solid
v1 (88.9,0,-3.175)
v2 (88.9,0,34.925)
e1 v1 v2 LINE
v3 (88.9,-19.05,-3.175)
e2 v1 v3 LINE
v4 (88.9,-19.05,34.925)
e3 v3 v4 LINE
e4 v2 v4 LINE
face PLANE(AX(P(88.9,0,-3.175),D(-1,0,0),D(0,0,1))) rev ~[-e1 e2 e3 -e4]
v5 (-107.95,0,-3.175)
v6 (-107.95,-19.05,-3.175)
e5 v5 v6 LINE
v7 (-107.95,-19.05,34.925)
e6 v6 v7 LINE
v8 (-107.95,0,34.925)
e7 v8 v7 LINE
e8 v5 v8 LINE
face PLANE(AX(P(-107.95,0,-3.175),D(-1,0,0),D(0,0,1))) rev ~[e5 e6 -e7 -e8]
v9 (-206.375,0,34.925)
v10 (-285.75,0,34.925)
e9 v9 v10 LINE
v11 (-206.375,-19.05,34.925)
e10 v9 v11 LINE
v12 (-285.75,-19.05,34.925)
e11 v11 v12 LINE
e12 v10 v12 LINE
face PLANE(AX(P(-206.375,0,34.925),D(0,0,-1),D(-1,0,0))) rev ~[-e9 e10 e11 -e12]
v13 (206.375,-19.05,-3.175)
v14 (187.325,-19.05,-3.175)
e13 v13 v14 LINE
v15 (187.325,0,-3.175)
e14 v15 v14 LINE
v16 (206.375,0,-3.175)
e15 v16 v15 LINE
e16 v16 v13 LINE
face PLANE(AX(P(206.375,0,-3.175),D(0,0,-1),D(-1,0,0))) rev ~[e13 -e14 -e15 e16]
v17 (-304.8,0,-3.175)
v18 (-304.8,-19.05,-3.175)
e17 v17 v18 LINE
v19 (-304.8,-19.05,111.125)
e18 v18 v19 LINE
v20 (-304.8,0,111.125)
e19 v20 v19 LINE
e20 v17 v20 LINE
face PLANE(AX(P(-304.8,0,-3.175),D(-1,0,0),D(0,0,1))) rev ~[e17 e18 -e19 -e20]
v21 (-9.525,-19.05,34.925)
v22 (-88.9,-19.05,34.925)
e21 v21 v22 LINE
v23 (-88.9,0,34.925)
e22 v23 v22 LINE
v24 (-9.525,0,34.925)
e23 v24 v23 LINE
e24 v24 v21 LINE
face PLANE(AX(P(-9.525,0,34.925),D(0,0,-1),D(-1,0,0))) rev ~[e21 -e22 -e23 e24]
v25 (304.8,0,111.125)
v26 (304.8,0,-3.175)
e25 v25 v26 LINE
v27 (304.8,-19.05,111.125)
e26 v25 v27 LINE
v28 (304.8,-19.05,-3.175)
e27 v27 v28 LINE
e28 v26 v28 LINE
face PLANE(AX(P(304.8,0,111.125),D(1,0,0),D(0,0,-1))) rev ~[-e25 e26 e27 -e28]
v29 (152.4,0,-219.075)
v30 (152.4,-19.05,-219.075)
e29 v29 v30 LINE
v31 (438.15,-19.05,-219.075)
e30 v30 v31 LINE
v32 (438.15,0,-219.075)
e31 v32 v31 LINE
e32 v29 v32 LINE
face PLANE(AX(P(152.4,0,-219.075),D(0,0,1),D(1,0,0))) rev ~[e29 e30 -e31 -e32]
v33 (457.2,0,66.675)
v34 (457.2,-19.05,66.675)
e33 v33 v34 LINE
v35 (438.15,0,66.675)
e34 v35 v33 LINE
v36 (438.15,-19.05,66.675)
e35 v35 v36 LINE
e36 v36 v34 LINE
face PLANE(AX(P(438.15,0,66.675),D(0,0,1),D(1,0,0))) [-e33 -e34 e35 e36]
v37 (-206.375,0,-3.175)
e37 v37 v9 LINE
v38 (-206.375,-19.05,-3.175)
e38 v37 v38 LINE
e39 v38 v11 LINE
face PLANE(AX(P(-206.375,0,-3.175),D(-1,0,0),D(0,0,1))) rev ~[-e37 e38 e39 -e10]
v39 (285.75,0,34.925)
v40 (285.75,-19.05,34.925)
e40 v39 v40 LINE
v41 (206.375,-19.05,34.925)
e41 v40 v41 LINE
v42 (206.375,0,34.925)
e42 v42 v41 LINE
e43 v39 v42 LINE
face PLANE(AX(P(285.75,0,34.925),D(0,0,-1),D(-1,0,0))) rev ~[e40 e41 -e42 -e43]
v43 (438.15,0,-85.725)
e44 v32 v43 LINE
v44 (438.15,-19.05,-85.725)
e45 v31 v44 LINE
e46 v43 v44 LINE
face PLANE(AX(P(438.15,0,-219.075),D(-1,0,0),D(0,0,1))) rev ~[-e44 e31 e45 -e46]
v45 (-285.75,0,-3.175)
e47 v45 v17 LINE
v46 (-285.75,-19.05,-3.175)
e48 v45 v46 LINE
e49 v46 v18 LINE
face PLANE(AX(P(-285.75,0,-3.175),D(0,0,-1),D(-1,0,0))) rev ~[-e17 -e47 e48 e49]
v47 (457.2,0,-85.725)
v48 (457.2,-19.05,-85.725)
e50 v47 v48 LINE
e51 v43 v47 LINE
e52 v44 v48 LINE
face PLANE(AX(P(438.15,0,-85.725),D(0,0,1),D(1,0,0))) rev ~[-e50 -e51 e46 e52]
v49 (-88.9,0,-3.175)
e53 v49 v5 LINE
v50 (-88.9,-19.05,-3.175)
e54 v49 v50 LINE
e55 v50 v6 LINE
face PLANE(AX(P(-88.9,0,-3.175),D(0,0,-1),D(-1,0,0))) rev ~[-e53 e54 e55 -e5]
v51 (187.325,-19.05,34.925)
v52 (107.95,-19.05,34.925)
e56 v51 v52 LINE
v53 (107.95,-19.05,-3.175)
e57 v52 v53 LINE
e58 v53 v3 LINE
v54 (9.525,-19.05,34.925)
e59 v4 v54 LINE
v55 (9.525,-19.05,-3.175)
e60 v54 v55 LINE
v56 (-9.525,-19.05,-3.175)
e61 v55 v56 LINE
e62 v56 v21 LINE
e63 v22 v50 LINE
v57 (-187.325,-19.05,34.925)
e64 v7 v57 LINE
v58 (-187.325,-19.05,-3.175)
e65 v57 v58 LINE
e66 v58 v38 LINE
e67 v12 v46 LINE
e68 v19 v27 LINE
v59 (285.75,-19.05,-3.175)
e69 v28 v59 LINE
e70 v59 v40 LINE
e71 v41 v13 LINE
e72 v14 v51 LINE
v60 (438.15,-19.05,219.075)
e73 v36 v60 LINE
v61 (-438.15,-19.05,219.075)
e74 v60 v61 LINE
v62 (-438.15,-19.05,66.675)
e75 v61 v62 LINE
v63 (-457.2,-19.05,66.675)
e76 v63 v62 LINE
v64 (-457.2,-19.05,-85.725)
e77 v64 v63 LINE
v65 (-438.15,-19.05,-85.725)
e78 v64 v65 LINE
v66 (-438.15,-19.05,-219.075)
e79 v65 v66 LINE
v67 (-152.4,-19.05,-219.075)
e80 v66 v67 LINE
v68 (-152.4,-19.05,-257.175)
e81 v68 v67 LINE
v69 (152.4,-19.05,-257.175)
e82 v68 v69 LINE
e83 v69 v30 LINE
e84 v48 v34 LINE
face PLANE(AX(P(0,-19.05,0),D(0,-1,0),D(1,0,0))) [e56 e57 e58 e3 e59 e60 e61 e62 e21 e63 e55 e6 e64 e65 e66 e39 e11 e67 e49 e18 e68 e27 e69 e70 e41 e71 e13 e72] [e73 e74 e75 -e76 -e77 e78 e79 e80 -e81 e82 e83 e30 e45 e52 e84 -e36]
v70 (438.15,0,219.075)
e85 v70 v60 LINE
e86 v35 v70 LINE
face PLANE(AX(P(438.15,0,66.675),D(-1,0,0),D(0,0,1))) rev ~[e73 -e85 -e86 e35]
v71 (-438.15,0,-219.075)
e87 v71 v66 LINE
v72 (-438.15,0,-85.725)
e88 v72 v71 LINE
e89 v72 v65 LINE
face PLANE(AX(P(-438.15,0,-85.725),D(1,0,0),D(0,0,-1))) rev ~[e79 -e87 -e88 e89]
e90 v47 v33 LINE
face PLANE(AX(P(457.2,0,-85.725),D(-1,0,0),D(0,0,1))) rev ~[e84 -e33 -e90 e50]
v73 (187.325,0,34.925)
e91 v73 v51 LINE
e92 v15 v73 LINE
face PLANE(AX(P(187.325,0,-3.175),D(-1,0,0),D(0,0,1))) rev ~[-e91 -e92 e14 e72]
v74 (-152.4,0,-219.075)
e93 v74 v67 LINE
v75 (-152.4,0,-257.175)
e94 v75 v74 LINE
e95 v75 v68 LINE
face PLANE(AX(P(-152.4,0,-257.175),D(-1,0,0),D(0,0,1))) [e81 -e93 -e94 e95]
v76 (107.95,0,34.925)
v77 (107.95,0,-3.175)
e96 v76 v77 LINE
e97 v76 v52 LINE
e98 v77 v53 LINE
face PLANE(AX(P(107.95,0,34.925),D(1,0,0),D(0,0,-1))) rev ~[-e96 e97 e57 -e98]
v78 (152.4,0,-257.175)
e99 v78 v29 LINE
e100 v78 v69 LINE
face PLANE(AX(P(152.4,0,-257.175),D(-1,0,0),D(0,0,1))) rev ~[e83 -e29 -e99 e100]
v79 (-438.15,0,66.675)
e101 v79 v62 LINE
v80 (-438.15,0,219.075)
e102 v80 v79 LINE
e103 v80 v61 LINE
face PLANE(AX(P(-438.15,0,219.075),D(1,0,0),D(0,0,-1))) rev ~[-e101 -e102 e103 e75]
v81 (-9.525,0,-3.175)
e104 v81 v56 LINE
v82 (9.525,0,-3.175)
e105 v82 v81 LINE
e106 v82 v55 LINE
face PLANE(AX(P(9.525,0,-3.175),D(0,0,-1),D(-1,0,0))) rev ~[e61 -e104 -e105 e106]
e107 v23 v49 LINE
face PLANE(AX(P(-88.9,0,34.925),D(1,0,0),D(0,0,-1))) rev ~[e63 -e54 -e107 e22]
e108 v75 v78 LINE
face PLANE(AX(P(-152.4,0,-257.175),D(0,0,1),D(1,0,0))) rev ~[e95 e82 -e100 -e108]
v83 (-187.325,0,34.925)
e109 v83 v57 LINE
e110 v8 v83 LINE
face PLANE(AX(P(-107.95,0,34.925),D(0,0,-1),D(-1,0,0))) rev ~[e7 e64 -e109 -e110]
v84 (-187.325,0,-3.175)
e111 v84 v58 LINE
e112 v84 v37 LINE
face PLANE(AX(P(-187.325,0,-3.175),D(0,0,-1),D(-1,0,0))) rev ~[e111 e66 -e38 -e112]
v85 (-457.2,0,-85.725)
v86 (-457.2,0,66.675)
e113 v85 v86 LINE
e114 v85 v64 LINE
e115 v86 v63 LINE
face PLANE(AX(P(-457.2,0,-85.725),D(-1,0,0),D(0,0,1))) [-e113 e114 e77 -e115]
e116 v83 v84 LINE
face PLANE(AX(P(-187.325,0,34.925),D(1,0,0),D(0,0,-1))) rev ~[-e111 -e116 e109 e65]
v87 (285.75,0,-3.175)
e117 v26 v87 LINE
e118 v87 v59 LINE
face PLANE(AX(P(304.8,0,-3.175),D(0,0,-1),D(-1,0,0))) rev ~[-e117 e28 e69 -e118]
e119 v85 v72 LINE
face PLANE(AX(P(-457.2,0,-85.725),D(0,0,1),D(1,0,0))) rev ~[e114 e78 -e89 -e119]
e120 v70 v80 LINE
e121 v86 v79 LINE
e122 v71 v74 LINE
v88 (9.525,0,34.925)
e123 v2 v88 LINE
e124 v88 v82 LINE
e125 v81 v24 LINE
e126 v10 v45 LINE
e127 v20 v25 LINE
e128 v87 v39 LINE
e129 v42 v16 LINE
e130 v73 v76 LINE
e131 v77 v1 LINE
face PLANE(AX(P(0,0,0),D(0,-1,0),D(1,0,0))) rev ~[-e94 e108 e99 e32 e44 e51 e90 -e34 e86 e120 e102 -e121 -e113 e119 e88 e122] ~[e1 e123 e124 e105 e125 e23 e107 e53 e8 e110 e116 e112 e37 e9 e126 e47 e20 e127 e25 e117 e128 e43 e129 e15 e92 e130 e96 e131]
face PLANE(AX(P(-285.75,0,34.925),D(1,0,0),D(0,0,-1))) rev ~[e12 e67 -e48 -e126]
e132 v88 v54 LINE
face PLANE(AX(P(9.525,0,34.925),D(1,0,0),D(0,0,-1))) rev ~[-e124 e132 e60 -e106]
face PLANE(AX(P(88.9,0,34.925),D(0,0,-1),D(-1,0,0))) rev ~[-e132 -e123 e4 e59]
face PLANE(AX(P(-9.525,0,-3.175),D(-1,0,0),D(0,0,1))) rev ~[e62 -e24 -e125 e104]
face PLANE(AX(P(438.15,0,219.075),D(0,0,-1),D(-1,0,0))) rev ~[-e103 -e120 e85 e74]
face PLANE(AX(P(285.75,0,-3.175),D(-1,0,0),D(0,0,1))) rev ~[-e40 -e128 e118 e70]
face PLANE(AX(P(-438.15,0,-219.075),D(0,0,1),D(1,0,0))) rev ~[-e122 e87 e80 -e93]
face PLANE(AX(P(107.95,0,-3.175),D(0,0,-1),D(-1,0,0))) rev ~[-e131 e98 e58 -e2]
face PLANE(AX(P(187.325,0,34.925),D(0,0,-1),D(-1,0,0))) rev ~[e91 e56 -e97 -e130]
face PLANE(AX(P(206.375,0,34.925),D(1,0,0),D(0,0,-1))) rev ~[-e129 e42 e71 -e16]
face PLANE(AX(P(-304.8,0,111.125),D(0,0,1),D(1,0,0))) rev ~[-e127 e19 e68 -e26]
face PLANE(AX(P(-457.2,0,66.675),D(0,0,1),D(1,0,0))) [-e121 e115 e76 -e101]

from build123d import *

# Parameters (mm, degrees)
F0_W     = 19.05
F0_H     = 152.4
F0_W_2   = 304.8
F0_H_2   = 38.1
F1_DEPTH = 19.05


# Not quite as in the source:
# - a feature names something its author has since deleted; it is built from what else it names


with BuildPart() as f1:
    # F0 (on Front) → F1 (new body)
    with BuildSketch(Plane.XZ):
        Polygon((438.15, 219.075), (-438.15, 219.075), (-438.15, 66.675), (-438.15, -85.725), (-438.15, -219.075), (-152.4, -219.075), (152.4, -219.075), (438.15, -219.075), (438.15, -85.725), (438.15, 66.675), align=None)
        Polygon((-304.8, 111.125), (304.8, 111.125), (304.8, 34.925), (304.8, -3.175), (285.75, -3.175), (285.75, 34.925), (206.375, 34.925), (206.375, -3.175), (187.325, -3.175), (187.325, 34.925), (107.95, 34.925), (107.95, -3.175), (88.9, -3.175), (88.9, 34.925), (9.525, 34.925), (9.525, -3.175), (-9.525, -3.175), (-9.525, 34.925), (-88.9, 34.925), (-88.9, -3.175), (-107.95, -3.175), (-107.95, 34.925), (-187.325, 34.925), (-187.325, -3.175), (-206.375, -3.175), (-206.375, 34.925), (-285.75, 34.925), (-285.75, -3.175), (-304.8, -3.175), (-304.8, 34.925), align=None, mode=Mode.SUBTRACT)
        with Locations((-447.675, -9.525)):
            Rectangle(F0_W, F0_H)
        with Locations((0, -238.125)):
            Rectangle(F0_W_2, F0_H_2)
        with Locations((447.675, -9.525)):
            Rectangle(F0_W, F0_H)
    extrude(amount=F1_DEPTH)


solid = f1.part
